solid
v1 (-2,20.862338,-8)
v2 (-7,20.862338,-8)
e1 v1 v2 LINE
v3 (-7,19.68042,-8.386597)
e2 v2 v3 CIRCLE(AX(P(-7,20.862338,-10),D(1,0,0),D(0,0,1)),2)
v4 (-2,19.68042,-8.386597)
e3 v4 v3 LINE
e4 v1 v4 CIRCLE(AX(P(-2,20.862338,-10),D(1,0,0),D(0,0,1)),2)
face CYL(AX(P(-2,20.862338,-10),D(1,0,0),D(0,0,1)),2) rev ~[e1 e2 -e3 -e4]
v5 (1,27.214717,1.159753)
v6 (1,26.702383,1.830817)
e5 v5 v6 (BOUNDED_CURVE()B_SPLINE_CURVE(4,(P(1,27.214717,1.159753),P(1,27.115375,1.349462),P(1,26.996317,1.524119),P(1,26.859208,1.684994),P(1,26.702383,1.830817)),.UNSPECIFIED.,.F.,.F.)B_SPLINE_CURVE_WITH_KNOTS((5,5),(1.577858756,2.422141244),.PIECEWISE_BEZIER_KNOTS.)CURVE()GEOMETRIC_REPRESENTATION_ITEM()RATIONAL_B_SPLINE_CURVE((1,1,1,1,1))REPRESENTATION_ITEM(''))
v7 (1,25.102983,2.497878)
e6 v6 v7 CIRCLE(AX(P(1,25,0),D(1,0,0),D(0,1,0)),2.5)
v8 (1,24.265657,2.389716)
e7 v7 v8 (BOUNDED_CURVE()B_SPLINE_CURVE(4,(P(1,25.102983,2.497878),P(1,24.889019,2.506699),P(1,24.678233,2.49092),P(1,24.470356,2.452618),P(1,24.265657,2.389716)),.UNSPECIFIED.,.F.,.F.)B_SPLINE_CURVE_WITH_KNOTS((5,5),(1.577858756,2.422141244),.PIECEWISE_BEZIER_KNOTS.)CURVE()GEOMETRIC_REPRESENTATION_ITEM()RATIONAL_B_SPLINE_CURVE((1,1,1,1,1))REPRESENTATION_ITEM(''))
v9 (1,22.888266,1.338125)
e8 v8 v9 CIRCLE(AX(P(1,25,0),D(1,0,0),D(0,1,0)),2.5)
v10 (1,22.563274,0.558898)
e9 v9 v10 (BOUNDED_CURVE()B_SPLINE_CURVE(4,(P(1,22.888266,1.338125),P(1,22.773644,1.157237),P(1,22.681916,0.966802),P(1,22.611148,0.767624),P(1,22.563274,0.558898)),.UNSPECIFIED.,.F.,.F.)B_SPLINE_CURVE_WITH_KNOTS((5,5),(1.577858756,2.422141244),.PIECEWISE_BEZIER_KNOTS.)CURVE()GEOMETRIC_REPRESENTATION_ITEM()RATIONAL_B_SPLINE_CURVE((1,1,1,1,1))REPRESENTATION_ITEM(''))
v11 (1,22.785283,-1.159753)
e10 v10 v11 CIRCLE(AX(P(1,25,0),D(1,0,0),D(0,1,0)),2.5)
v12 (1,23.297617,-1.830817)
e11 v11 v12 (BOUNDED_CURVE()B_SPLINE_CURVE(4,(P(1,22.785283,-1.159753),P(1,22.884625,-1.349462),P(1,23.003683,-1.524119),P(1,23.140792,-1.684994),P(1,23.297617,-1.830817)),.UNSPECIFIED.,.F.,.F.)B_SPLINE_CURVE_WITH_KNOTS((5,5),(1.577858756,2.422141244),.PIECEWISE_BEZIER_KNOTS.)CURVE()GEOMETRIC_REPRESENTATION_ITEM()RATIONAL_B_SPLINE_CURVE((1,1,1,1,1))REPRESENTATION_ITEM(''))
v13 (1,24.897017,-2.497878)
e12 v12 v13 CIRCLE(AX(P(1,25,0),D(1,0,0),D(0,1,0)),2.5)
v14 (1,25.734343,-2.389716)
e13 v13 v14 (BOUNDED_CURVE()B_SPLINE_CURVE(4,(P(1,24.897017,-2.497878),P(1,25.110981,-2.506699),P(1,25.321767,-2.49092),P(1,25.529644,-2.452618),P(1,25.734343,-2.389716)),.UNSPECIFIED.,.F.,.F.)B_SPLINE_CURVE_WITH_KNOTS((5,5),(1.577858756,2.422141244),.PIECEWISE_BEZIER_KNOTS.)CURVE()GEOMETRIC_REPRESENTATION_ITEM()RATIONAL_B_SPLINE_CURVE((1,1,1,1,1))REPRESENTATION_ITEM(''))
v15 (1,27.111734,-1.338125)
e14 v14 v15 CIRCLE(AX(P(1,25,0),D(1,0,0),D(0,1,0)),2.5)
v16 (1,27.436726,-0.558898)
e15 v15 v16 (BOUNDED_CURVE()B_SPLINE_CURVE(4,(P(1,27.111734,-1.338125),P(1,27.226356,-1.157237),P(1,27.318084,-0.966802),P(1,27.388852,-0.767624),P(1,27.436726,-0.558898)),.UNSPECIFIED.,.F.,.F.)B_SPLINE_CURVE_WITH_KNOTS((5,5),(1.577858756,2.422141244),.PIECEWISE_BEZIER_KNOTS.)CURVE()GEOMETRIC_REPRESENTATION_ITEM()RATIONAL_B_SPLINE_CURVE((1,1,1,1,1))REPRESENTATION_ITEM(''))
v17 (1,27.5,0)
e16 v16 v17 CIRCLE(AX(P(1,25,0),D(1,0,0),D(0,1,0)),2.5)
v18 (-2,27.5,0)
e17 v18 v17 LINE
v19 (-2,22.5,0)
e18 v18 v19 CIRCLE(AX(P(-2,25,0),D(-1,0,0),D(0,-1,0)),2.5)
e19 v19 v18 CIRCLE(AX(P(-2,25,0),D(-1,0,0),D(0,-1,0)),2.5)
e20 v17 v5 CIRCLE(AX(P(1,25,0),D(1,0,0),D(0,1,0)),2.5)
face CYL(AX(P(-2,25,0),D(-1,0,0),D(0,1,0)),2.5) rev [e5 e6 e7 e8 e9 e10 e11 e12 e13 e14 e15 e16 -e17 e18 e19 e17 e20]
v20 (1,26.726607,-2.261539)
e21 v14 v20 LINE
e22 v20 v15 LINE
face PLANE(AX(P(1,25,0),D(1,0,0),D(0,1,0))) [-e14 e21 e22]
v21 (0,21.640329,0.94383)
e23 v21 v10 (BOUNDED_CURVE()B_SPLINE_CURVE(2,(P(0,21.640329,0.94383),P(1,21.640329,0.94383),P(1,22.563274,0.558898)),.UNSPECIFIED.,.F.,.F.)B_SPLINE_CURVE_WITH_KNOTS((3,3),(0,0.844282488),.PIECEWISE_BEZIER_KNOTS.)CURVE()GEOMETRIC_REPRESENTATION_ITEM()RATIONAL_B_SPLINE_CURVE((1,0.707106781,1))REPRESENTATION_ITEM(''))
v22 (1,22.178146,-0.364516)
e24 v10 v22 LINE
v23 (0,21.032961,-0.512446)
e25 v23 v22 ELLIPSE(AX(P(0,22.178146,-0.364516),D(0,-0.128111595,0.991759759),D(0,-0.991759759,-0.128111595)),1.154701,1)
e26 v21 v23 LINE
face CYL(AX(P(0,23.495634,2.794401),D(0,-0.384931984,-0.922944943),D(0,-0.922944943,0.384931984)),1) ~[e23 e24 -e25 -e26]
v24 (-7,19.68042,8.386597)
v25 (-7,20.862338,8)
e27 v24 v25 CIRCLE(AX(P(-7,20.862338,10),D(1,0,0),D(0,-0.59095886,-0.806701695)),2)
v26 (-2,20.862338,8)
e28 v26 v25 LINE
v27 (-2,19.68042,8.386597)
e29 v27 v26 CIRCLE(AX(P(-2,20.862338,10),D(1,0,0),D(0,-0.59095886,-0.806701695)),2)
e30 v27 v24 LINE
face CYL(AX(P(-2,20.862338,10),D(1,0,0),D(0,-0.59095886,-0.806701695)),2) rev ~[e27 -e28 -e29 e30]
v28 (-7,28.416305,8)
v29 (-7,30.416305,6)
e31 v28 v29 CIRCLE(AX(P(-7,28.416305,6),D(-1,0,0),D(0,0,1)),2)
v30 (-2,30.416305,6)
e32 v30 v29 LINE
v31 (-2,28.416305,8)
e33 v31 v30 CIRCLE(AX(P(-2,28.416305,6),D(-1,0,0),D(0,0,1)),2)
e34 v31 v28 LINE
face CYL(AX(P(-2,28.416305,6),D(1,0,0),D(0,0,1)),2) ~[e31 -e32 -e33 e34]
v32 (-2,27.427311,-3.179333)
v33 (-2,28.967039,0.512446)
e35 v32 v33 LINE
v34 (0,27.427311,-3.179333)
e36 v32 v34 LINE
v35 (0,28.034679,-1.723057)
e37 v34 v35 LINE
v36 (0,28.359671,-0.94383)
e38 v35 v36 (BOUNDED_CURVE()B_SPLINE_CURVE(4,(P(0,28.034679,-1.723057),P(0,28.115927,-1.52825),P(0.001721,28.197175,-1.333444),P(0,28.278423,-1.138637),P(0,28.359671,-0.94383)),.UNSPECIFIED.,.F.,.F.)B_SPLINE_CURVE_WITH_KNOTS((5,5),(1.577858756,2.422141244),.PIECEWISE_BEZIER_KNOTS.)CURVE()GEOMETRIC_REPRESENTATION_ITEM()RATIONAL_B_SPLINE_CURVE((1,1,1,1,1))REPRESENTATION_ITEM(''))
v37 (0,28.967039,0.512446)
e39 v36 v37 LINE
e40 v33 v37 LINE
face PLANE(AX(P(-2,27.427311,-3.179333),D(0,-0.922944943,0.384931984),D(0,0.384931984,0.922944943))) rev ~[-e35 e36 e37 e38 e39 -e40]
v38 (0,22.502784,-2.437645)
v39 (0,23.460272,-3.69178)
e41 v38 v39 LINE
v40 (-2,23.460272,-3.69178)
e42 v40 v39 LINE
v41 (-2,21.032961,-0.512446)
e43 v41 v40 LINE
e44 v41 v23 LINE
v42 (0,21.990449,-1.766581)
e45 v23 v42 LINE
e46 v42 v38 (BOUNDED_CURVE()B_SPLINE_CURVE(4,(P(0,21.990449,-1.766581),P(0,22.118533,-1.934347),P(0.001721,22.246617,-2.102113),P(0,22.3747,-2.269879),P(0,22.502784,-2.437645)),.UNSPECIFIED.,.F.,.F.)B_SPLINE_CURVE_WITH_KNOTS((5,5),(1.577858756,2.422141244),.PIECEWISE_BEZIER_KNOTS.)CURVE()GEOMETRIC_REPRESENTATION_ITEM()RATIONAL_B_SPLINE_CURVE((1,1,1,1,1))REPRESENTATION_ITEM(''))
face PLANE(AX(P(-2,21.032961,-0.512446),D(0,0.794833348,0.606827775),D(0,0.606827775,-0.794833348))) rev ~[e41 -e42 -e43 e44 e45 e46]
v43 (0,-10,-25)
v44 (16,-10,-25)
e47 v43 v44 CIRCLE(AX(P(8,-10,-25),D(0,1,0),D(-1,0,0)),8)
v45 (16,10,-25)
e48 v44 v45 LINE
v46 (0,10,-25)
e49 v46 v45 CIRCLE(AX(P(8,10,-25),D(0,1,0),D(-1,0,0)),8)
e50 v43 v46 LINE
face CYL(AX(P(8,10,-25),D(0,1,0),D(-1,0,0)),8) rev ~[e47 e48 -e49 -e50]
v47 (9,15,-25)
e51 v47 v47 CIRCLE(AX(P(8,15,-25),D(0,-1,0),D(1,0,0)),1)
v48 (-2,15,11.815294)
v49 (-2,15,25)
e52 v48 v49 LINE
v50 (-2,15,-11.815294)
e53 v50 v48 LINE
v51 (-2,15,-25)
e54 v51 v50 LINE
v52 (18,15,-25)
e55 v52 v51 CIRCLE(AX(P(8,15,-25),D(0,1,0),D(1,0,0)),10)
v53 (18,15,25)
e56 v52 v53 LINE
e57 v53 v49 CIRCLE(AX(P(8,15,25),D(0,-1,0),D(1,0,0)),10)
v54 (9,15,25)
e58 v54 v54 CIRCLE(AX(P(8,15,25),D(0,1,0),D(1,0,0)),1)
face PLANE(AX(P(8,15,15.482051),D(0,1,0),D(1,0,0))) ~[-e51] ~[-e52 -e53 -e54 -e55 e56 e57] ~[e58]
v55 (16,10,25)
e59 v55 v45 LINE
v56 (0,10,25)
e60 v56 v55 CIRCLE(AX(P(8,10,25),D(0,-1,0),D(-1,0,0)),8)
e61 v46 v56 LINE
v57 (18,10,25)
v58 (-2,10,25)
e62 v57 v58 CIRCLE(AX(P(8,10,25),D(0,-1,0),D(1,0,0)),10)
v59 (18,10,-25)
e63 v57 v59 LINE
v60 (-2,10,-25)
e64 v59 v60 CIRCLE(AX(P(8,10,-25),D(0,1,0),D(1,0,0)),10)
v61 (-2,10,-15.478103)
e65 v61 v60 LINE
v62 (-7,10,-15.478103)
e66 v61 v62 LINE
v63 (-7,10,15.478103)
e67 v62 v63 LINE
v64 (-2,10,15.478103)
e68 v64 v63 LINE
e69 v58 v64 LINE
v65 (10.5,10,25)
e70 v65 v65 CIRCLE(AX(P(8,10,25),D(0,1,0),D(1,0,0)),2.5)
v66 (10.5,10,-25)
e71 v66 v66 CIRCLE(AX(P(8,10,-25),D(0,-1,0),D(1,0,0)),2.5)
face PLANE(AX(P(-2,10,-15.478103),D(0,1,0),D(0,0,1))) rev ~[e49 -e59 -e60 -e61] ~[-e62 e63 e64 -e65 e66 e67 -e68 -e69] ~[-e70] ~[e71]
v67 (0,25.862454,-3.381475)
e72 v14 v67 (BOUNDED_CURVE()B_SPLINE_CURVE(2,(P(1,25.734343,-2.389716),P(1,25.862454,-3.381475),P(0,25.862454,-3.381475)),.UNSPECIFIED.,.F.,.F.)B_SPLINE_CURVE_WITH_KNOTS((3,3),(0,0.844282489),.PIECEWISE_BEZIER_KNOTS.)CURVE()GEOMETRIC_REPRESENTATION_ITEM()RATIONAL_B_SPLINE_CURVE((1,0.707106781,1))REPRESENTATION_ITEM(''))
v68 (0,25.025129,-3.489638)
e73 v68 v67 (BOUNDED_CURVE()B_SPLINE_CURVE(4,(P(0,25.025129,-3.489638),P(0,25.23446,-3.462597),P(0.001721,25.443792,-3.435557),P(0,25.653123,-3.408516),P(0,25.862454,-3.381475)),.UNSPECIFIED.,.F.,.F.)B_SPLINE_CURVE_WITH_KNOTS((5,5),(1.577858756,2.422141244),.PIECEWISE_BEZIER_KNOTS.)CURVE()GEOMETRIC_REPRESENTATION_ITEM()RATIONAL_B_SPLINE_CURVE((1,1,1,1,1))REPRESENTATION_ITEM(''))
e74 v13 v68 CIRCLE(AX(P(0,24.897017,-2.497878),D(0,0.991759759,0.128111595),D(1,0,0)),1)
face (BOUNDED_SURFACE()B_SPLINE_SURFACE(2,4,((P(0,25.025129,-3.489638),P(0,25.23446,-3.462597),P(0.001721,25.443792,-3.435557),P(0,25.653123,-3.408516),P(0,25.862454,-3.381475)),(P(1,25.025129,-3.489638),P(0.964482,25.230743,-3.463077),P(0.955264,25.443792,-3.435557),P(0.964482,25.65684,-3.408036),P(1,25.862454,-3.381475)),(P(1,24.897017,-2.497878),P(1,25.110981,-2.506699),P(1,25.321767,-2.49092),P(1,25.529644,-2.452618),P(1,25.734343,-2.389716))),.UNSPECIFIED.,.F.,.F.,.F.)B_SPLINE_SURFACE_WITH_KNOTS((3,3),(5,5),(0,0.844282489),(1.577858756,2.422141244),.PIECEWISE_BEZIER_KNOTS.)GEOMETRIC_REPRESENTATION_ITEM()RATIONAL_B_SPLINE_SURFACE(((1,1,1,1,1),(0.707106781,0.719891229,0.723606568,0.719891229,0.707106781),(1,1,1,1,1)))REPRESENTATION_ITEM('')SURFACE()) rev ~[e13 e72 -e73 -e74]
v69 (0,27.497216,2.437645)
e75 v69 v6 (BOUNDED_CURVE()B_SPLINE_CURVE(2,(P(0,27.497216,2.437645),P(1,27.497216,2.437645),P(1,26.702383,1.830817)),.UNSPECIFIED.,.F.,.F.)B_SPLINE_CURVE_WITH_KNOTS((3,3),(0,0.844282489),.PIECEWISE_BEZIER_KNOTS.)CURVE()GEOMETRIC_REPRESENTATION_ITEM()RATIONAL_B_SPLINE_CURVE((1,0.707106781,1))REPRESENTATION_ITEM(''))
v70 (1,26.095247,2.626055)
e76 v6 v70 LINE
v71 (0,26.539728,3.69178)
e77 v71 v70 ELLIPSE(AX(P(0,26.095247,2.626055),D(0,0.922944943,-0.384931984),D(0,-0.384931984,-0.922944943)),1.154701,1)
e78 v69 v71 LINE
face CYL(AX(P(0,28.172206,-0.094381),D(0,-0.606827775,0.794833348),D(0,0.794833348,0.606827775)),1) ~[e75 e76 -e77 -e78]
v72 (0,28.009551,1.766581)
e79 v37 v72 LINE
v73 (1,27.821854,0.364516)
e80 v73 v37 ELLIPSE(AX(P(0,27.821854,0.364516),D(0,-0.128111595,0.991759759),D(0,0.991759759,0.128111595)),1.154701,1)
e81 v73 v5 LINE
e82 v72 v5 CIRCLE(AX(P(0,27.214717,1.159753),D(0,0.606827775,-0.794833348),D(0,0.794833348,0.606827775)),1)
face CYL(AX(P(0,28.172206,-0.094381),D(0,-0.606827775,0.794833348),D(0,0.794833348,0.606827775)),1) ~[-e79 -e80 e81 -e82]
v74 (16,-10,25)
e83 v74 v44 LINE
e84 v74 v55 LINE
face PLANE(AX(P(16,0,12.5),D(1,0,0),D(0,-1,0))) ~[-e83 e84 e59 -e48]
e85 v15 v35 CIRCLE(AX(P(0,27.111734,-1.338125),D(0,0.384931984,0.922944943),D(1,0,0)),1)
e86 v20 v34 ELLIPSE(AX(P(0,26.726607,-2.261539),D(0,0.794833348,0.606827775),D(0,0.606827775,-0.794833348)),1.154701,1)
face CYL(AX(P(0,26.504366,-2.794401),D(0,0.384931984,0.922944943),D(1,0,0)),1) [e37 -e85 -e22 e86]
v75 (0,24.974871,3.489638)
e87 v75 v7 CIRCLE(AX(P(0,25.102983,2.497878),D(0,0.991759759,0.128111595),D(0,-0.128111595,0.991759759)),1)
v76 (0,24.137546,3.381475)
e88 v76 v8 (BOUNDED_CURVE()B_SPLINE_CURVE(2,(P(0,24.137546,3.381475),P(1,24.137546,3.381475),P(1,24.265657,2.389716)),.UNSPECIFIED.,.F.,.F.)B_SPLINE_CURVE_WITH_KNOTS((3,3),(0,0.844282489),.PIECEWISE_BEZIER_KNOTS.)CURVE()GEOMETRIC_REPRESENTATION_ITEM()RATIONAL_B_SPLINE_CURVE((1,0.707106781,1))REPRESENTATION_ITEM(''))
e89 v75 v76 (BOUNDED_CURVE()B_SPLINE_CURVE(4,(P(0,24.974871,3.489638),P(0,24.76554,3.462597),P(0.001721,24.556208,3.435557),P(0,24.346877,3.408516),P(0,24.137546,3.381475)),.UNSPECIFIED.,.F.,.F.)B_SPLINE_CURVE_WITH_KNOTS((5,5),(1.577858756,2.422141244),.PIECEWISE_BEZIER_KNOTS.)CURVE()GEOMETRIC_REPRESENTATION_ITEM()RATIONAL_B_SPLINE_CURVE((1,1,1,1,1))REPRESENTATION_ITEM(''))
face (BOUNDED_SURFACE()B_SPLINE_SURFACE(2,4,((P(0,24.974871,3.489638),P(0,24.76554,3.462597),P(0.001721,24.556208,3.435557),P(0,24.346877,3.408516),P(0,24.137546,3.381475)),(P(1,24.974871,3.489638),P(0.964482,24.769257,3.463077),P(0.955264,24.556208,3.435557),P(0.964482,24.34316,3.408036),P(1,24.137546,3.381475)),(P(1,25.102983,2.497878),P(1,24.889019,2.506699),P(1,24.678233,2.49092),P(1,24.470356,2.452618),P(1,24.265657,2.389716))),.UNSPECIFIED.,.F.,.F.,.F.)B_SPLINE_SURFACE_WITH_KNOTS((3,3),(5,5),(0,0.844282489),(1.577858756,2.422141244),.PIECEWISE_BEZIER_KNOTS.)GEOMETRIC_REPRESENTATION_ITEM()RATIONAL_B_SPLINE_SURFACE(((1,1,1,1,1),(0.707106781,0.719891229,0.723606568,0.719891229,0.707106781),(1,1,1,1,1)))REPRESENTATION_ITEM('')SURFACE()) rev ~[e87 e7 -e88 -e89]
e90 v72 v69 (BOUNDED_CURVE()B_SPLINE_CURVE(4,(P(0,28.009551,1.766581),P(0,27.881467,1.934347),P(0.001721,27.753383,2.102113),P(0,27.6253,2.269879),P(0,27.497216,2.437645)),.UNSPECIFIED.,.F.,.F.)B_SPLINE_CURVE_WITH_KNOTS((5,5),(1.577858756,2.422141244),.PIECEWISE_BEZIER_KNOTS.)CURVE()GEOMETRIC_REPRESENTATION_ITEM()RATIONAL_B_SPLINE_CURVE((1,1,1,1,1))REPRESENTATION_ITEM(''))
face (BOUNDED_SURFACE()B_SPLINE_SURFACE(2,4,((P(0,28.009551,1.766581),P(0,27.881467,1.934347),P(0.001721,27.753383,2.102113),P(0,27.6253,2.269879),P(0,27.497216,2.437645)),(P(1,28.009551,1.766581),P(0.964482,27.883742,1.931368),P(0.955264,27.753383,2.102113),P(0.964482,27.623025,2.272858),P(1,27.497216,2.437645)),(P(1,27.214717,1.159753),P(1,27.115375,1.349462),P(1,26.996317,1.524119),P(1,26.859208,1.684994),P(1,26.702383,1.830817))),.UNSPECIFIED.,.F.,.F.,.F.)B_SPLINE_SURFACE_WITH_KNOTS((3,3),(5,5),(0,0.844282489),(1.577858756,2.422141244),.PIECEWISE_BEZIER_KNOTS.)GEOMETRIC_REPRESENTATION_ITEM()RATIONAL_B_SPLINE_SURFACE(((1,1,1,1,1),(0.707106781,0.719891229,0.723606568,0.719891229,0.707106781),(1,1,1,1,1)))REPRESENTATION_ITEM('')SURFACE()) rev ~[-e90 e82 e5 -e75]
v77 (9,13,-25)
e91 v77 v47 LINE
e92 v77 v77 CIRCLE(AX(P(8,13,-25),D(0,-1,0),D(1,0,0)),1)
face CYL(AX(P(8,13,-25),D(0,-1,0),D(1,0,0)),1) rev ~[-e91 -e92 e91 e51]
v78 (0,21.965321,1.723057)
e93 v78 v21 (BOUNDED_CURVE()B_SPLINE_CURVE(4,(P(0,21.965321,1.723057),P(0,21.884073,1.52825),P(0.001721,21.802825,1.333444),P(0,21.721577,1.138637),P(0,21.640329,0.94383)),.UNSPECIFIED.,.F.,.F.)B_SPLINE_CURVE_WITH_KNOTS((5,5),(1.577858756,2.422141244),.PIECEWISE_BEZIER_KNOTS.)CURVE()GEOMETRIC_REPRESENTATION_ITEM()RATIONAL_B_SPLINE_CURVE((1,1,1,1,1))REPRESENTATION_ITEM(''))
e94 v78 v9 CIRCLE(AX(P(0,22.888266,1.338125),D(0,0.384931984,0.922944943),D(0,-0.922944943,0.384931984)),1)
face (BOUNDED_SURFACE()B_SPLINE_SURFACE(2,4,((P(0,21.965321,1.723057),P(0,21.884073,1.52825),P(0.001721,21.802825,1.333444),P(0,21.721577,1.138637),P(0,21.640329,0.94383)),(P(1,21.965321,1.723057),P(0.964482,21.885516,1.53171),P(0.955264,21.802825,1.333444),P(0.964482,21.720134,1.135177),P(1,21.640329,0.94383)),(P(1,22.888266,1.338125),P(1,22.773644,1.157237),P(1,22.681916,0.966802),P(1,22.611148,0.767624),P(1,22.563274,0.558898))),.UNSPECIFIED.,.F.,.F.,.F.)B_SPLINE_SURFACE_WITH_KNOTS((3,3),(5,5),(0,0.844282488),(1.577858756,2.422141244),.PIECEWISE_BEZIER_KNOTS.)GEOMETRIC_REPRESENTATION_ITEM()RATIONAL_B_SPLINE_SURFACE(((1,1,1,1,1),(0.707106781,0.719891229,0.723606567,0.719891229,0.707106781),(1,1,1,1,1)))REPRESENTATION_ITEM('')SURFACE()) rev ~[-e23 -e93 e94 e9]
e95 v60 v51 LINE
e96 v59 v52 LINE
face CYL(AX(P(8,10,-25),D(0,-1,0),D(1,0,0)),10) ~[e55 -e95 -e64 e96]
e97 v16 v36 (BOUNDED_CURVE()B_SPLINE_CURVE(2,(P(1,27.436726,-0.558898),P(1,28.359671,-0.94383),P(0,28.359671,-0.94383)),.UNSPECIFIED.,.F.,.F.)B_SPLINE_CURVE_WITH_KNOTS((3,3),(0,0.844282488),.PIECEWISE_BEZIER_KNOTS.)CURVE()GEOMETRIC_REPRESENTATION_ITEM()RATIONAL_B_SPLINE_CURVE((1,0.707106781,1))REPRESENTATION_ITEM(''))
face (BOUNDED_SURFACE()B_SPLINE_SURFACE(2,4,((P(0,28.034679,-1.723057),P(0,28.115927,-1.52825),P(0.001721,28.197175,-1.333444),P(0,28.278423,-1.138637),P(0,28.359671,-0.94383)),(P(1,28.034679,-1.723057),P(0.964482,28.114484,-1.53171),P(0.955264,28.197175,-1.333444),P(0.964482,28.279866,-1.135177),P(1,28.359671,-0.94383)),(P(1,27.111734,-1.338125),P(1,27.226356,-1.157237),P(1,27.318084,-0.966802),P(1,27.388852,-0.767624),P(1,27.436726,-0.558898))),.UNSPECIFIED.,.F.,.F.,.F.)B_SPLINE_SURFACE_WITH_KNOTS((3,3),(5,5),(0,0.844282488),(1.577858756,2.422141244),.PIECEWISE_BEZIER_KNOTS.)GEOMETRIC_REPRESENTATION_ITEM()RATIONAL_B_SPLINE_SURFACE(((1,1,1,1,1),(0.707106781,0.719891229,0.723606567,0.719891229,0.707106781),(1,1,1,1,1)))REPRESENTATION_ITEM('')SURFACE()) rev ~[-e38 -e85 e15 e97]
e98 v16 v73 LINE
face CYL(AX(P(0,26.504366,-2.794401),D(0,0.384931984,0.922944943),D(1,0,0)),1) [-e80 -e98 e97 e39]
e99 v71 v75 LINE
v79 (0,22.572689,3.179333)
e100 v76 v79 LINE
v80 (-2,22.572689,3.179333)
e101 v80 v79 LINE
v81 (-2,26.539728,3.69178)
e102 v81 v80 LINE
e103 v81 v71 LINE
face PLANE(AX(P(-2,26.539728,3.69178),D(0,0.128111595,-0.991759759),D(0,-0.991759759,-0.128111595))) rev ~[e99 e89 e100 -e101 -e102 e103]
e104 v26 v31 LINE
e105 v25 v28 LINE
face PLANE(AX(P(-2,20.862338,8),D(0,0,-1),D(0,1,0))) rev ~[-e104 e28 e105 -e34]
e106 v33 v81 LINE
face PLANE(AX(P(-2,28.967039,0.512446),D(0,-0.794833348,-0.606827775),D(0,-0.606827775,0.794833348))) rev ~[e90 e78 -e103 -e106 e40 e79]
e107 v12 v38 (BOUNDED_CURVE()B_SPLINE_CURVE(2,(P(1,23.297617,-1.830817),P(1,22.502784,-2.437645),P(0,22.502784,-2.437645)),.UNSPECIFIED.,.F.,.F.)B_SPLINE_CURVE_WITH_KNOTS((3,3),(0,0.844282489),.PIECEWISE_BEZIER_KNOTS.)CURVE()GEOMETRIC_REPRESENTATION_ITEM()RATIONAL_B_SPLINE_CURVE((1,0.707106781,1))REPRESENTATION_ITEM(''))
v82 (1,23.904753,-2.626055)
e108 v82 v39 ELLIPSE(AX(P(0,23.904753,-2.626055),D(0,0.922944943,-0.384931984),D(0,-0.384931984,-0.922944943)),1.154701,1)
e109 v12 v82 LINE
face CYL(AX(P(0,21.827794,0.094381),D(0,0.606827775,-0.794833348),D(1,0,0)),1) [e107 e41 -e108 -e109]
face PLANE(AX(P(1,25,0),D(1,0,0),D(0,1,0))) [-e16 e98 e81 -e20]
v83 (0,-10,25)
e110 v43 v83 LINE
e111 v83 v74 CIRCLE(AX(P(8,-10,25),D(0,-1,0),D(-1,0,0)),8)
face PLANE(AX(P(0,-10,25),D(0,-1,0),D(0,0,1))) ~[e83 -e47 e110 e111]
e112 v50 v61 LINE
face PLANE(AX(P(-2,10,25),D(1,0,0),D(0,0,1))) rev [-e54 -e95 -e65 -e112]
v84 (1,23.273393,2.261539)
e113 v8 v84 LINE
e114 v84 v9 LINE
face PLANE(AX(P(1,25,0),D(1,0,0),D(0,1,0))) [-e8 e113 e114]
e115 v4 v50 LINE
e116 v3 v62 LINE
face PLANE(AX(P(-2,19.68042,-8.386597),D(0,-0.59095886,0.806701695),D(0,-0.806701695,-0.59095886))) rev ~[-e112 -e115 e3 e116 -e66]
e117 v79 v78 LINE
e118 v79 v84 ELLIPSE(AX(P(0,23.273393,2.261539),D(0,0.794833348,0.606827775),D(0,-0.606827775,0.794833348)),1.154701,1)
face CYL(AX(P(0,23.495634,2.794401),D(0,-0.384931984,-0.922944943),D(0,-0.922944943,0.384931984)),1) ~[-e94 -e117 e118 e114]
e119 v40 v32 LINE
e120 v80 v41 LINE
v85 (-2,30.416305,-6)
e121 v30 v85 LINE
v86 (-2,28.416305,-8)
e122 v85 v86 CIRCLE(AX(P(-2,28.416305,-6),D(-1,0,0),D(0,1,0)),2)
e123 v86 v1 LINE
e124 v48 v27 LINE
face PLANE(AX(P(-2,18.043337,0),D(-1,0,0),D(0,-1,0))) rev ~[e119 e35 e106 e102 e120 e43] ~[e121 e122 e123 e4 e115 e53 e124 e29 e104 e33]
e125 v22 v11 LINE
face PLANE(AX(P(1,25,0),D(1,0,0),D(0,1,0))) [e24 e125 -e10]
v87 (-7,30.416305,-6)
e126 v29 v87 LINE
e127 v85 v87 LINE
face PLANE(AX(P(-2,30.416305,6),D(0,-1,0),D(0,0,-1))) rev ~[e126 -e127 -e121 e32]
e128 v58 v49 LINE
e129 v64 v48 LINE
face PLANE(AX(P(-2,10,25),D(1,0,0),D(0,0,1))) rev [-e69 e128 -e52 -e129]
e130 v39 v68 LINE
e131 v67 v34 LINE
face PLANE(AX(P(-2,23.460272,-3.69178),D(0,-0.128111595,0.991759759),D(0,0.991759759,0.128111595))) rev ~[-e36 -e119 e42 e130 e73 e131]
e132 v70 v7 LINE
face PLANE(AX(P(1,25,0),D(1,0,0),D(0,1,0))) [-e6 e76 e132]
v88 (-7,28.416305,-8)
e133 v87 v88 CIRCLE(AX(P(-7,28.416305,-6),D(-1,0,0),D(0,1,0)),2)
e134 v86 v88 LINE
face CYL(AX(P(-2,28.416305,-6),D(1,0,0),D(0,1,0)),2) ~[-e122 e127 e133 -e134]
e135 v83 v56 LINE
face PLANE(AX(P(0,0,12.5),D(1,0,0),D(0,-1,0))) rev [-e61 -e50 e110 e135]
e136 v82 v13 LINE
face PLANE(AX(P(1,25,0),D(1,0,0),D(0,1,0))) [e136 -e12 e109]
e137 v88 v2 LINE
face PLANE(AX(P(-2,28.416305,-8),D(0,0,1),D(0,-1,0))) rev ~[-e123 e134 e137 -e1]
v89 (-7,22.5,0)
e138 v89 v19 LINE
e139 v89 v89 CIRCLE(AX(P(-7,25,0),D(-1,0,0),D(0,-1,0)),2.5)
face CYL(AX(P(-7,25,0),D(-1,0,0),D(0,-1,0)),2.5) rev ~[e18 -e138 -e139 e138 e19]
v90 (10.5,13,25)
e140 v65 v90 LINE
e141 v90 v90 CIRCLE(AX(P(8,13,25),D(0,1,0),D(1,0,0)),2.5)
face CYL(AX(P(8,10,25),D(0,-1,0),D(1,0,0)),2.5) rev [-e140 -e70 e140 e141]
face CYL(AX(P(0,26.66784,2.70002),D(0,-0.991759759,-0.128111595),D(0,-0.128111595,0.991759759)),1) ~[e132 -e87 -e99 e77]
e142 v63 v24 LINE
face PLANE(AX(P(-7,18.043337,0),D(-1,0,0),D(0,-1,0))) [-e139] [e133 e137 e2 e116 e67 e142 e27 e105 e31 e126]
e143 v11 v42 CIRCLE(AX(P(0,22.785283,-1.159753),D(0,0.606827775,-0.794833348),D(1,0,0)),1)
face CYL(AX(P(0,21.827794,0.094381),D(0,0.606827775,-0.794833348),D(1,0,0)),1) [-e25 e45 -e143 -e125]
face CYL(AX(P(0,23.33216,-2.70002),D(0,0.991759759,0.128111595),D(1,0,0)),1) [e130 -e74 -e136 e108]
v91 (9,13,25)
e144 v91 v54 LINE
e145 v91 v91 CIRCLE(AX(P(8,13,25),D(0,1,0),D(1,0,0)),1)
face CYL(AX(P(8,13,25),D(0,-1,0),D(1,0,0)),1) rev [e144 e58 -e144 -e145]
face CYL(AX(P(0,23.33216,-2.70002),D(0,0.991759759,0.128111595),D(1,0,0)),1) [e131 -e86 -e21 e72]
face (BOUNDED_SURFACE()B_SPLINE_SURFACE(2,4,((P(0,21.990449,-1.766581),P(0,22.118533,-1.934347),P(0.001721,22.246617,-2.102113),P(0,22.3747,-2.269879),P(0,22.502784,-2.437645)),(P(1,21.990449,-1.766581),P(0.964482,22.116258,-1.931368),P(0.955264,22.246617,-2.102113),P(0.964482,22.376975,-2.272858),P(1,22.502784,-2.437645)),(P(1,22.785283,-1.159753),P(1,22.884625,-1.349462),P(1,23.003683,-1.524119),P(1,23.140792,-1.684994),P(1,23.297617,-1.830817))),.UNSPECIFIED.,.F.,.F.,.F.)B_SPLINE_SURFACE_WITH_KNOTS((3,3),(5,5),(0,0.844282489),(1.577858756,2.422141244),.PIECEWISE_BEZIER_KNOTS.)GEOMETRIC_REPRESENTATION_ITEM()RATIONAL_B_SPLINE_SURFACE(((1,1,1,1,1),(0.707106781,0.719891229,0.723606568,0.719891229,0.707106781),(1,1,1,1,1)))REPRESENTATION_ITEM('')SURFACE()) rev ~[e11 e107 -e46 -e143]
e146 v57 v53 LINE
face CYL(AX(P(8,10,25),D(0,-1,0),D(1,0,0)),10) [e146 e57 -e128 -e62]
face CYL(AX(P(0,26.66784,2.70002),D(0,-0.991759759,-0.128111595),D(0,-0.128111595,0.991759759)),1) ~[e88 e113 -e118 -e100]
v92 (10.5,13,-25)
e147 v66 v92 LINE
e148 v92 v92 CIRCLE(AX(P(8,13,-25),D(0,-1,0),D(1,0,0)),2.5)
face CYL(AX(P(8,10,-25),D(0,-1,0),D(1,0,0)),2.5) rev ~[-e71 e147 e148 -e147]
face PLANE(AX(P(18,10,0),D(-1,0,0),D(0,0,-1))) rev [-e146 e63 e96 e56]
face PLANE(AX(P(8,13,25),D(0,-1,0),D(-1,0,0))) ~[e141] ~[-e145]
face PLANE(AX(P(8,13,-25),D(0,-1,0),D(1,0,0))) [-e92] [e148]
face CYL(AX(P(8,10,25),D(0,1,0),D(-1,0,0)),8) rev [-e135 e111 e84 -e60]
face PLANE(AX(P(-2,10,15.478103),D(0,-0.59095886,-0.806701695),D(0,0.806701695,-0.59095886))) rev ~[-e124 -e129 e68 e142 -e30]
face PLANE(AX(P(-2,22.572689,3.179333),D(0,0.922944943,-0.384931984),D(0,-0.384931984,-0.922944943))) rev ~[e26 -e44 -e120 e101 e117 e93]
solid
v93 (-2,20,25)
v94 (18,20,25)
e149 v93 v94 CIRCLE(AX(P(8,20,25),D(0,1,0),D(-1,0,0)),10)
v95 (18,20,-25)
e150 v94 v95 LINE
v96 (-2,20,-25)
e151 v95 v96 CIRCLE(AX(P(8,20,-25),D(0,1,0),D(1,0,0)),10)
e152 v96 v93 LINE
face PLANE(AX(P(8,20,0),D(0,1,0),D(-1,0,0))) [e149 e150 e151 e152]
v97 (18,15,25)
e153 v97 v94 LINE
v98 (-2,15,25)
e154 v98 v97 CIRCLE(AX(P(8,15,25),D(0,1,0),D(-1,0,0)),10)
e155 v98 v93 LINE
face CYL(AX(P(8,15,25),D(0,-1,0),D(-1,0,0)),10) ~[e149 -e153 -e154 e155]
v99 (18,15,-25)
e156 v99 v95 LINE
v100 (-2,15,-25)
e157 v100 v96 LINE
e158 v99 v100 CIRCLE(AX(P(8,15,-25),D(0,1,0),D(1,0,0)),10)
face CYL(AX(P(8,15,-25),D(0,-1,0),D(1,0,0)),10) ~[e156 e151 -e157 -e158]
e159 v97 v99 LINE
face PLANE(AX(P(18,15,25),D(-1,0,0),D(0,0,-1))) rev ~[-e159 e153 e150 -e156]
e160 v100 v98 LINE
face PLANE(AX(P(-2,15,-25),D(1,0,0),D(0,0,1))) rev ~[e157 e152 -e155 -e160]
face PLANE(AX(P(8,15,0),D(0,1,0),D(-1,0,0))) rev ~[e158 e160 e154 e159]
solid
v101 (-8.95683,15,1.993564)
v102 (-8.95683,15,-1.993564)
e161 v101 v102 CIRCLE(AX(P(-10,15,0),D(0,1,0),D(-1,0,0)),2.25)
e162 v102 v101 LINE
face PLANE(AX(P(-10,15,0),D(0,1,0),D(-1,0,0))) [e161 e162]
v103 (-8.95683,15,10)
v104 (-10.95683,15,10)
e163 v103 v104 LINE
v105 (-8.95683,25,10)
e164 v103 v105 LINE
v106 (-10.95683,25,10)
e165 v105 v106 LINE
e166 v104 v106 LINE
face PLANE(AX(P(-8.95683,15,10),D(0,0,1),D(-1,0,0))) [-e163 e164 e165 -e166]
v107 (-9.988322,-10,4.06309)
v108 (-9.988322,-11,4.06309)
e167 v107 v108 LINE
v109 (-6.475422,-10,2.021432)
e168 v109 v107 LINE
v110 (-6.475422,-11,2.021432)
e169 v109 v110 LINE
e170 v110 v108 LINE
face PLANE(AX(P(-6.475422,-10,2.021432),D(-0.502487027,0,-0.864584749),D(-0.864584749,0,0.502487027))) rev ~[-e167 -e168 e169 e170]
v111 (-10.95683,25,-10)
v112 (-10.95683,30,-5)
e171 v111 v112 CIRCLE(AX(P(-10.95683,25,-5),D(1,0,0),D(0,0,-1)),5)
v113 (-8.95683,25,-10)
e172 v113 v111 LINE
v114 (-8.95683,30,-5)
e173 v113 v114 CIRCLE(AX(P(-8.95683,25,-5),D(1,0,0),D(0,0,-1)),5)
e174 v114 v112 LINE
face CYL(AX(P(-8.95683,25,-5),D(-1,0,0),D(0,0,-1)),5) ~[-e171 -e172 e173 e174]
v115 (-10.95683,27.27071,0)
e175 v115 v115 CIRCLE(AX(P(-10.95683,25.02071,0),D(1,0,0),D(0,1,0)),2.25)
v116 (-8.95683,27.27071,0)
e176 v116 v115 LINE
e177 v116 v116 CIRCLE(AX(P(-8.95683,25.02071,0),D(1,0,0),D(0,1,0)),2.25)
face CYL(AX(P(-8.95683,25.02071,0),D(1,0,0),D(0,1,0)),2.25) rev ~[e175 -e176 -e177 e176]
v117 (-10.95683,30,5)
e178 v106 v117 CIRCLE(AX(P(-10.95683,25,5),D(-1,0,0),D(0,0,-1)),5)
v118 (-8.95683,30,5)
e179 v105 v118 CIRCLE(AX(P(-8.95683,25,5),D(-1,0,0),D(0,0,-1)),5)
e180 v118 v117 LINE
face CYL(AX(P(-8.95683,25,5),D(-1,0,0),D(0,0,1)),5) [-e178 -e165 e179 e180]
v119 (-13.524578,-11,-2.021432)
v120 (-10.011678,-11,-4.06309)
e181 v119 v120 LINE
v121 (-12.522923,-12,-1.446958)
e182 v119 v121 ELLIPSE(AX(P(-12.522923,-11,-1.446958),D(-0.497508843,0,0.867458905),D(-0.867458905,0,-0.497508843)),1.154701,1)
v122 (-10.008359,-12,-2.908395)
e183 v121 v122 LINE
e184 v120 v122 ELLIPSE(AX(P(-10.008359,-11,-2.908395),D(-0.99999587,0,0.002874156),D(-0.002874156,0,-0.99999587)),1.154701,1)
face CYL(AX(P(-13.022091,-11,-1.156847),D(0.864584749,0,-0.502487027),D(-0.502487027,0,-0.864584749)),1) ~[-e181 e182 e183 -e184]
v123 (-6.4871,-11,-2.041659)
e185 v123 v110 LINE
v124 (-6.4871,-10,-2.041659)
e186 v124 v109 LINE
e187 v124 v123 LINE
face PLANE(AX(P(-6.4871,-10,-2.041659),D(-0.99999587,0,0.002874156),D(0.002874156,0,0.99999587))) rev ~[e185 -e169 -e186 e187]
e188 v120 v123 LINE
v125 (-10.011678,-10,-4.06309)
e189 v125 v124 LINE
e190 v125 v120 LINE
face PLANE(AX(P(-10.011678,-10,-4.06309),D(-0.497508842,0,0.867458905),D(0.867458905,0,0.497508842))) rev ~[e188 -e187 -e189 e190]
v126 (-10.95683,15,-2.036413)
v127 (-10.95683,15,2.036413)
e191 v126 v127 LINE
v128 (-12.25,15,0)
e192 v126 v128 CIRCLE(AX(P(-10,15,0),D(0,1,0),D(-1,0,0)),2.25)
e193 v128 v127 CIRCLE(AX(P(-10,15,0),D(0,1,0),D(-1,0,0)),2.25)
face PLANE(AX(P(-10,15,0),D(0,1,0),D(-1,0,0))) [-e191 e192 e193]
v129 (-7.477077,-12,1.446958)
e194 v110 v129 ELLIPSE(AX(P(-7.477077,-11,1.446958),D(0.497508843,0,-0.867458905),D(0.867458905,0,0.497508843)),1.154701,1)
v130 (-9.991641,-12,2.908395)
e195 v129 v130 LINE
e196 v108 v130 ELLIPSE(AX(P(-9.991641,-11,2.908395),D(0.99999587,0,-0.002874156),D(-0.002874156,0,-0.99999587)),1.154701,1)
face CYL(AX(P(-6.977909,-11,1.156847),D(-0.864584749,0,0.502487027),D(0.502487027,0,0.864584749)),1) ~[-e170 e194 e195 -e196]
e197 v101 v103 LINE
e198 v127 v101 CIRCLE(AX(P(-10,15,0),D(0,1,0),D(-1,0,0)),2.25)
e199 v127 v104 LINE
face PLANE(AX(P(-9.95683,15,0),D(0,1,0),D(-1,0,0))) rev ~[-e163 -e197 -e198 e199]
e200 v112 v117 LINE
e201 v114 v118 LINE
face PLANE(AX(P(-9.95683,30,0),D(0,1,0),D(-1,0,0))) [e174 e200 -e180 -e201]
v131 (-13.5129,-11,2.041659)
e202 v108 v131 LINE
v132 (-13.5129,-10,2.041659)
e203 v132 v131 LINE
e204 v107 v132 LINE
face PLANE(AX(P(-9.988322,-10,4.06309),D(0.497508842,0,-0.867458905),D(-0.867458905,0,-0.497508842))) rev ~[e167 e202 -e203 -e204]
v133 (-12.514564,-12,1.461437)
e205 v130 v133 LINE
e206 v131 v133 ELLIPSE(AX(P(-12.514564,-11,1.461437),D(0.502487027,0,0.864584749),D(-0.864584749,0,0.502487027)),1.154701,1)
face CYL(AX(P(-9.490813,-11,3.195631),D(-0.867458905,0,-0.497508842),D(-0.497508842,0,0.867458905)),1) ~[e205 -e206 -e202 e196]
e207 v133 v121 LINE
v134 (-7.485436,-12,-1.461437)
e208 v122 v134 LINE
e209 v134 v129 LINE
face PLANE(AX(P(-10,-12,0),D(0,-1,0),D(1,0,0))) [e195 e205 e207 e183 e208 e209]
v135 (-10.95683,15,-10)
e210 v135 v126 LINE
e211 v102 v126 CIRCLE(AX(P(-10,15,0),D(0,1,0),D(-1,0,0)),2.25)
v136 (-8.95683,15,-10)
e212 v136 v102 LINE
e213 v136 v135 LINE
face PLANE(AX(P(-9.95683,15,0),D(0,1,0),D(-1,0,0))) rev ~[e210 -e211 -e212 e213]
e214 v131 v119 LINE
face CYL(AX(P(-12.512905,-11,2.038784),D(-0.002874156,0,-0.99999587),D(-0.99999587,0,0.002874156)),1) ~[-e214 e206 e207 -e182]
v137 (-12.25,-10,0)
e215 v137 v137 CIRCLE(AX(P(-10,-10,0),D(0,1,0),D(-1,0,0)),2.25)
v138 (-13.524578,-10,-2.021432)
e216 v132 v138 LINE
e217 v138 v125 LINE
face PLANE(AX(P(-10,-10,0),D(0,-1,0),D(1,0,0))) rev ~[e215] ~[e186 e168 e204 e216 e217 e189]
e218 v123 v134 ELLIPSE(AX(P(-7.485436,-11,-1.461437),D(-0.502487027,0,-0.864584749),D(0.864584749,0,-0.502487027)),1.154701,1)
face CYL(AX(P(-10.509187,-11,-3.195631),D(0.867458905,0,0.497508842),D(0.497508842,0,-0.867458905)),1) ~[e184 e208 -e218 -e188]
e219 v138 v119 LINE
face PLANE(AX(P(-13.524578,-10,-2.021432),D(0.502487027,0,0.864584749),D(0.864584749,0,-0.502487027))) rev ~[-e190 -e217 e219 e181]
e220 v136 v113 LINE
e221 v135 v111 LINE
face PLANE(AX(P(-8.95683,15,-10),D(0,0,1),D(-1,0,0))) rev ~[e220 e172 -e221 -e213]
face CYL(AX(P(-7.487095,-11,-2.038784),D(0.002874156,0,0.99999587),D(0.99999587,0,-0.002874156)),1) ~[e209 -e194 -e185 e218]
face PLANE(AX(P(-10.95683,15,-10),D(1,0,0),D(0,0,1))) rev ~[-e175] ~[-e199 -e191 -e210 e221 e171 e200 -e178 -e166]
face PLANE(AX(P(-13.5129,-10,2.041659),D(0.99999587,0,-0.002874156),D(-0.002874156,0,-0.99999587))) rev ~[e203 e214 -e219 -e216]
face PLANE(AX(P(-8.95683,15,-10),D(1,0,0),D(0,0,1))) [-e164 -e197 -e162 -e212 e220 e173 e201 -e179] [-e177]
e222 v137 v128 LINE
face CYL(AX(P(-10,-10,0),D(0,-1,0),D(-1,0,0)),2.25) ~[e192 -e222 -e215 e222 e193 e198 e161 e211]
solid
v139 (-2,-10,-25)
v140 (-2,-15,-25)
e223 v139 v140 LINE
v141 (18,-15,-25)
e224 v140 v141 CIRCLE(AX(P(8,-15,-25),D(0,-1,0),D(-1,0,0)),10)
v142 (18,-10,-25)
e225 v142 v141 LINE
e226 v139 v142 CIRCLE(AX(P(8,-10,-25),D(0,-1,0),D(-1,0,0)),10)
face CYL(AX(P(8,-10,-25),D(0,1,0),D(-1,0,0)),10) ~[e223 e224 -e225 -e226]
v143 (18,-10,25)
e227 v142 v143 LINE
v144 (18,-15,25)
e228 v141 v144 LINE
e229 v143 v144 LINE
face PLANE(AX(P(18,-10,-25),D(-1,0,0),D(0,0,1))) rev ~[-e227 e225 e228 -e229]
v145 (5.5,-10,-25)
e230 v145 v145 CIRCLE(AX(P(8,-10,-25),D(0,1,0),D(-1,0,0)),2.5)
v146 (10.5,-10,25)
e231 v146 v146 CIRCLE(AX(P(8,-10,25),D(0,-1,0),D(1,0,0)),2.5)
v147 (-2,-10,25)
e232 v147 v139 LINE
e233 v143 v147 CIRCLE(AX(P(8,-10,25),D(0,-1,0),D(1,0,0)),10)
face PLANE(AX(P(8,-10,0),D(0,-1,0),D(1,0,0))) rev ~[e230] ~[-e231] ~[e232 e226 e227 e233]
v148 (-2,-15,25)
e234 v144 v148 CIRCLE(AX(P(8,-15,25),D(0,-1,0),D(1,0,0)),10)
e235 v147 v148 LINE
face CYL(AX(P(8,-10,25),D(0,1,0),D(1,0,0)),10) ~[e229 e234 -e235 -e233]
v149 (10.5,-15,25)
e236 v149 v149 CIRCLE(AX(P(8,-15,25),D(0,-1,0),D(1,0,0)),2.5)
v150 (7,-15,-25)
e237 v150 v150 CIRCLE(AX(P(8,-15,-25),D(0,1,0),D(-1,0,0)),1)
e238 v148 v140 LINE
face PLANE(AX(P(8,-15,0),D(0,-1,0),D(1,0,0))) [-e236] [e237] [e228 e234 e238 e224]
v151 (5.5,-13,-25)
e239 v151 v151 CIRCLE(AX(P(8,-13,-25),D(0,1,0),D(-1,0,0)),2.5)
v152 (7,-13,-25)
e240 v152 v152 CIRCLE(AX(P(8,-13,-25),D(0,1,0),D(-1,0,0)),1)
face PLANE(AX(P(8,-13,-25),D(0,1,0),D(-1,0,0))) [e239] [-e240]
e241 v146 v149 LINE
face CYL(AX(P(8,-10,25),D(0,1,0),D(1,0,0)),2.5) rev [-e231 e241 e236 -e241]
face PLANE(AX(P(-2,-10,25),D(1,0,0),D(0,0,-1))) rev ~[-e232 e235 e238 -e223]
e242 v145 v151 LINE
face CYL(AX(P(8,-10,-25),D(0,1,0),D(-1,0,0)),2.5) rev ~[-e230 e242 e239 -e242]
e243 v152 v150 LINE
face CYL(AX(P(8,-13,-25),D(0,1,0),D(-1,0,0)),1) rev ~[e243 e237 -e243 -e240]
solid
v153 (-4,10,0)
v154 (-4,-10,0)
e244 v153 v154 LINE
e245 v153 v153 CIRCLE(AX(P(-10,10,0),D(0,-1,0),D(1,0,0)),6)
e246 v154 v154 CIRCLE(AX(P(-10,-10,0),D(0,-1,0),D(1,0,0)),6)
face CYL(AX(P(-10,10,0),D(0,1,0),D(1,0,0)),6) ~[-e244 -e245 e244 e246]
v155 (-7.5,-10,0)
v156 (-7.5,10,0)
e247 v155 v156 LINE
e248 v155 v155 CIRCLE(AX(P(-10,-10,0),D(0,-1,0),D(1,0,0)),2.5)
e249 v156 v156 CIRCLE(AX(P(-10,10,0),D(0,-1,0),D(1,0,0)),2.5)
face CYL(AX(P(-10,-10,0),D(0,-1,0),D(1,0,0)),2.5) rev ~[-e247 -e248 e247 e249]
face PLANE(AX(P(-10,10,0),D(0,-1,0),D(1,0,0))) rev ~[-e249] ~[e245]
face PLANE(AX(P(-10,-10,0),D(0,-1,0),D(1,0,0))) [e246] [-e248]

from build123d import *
from build123d import SkipClean  # not in build123d's __all__

# Parameters (mm, degrees)
F0_W      = 20
F0_H      = 25
F1_DEPTH  = 16
F3_DEPTH  = 20.001
F5_DEPTH  = 5
F6_R      = 2.5
F7_DEPTH  = 3
F8_R      = 1
F9_DEPTH  = 2.001
F11_R     = 2.5
F12_DEPTH = 5
F13_R     = 2.5
F14_DEPTH = 3
F15_R     = 1
F16_DEPTH = 2.001
F18_DEPTH = 5
F19_R     = 2.5
F20_DEPTH = 25.001
F21_R     = 2.5
F22_DEPTH = 3
F23_R     = 1
F25_DEPTH = 5
F26_R     = 6
F27_DEPTH = 20
F28_R     = 2.5
F29_DEPTH = 40.4173054965
F31_DEPTH = 2
F32_R     = 1
F33_R     = 2.25
F34_DEPTH = 25
F35_W     = 2
F35_H     = 20
F36_DEPTH = 15
F37_R     = 5
F38_R     = 2.25
F39_DEPTH = 7.0441698188


with BuildPart() as f1:
    # F0 (on Right) → F1 (new body)
    with BuildSketch(Plane.YZ):
        with Locations((0, -12.5)):
            Rectangle(F0_W, F0_H)
    extrude(amount=F1_DEPTH)

    # F2 (on face) → F3 (cut, through all)
    with BuildSketch(Plane(origin=(0, 10, 0), x_dir=(-1, 0, 0), z_dir=(0, 1, 0))):
        with BuildLine():
            Line((-16, -25), (0, -25))
            ThreePointArc((0, -25), (-8, -17), (-16, -25))
        make_face()
    extrude(amount=-F3_DEPTH, mode=Mode.SUBTRACT)

    # F4 (on face) → F5 (join)
    with BuildSketch(Plane(origin=(0, 10, 0), x_dir=(-1, 0, 0), z_dir=(0, 1, 0))):
        with BuildLine():
            Line((-18, 0), (-18, -25))
            ThreePointArc((-18, -25), (-8, -35), (2, -25))
            Line((2, -25), (2, 0))
            Line((2, 0), (-18, 0))
        make_face()
    extrude(amount=F5_DEPTH)

    # F6 (on face) → F7 (cut)
    with BuildSketch(Plane.XZ.offset(-10)):
        with Locations((8, -25)):
            Circle(F6_R)
    extrude(amount=-F7_DEPTH, mode=Mode.SUBTRACT)

    # F8 (on face) → F9 (cut, through all)
    with BuildSketch(Plane.XZ.offset(-13)):
        with Locations((8, -25)):
            Circle(F8_R)
    extrude(amount=-F9_DEPTH, mode=Mode.SUBTRACT)

    # F10: F1 across plane


with BuildPart() as f1_1:
    add(f1.part, clean=False)
    add(f1.part.mirror(Plane.XY), clean=False)

    # F17 (on face) → F18 (join)
    with BuildSketch(Plane(origin=(-2, 0, 0), x_dir=(0, -1, 0), z_dir=(-1, 0, 0))):
        with BuildLine():
            Line((-28.4163054965, -8), (-20.862338065, -8))
            ThreePointArc((-20.862338065, -8), (-20.2405691294, -8.0991045819), (-19.6804203442, -8.3865966093))
            Line((-19.6804203442, -8.3865966093), (-10, -15.4781029345))
            Line((-10, -15.4781029345), (-10, -8))
            Line((-10, -8), (-10, 8))
            Line((-10, 8), (-10, 15.4781029345))
            Line((-10, 15.4781029345), (-19.6804203442, 8.3865966093))
            ThreePointArc((-19.6804203442, 8.3865966093), (-20.2405691294, 8.0991045819), (-20.862338065, 8))
            Line((-20.862338065, 8), (-28.4163054965, 8))
            ThreePointArc((-28.4163054965, 8), (-29.8305190589, 7.4142135624), (-30.4163054965, 6))
            Line((-30.4163054965, 6), (-30.4163054965, -6))
            ThreePointArc((-30.4163054965, -6), (-29.8305190589, -7.4142135624), (-28.4163054965, -8))
        make_face()
    extrude(amount=F18_DEPTH)

    # F19 (on face) → F20 (cut, through all)
    with BuildSketch(Plane(origin=(-7, 0, 0), x_dir=(0, -1, 0), z_dir=(-1, 0, 0))):
        with Locations((-25, 0)):
            Circle(F19_R)
    extrude(amount=-F20_DEPTH, mode=Mode.SUBTRACT)

    # F21 (on face) → F22 (join)
    with BuildSketch(Plane.YZ.offset(-2)):
        Polygon((26.5397279342, 3.6917797725), (22.5726888989, 3.1793333922), (21.0329609647, -0.5124463803), (23.4602720658, -3.6917797725), (27.4273111011, -3.1793333922), (28.9670390353, 0.5124463803), align=None)
        with Locations((25, 0)):
            Circle(F21_R, mode=Mode.SUBTRACT)
    with SkipClean():  # cleaning this boolean's faces spoils the solid; the shape is the same uncleaned
        extrude(amount=F22_DEPTH)

    # F23
    f23_edges = [f1_1.edges().sort_by_distance(p)[0] for p in [
        (1, 24.556208, 3.435557),
        (1, 21.802825, 1.333444),
        (1, 22.246617, -2.102113),
        (1, 25.443792, -3.435557),
        (1, 28.197175, -1.333444),
        (1, 27.753383, 2.102113),
    ]]
    fillet(f23_edges, radius=F23_R)


with BuildPart() as f12:
    # F11 (on face) → F12 (new body)
    with BuildSketch(Plane.XZ.offset(10)):
        with BuildLine():
            Line((-2, 25), (-2, -25))
            ThreePointArc((-2, -25), (8, -35), (18, -25))
            Line((18, -25), (18, 25))
            ThreePointArc((18, 25), (8, 35), (-2, 25))
        make_face()
        with BuildLine():
            Line((0, -25), (0, 25))
            ThreePointArc((0, 25), (8, 17), (16, 25))
            Line((16, 25), (16, -25))
            ThreePointArc((16, -25), (8, -17), (0, -25))
        make_face(mode=Mode.SUBTRACT)
        with Locations((8, 25)):
            Circle(F11_R, mode=Mode.SUBTRACT)
        with BuildLine():
            ThreePointArc((16, 25), (8, 17), (0, 25))
            Line((0, 25), (0, -25))
            ThreePointArc((0, -25), (8, -17), (16, -25))
            Line((16, -25), (16, 25))
        make_face()
    extrude(amount=F12_DEPTH)

    # F13 (on face) → F14 (cut)
    with BuildSketch(Plane(origin=(0, -10, 0), x_dir=(-1, 0, 0), z_dir=(0, 1, 0))):
        with Locations((-8, -25)):
            Circle(F13_R)
    extrude(amount=-F14_DEPTH, mode=Mode.SUBTRACT)

    # F15 (on face) → F16 (cut, through all)
    with BuildSketch(Plane(origin=(0, -13, 0), x_dir=(-1, 0, 0), z_dir=(0, 1, 0))):
        with Locations((-8, -25)):
            Circle(F15_R)
    extrude(amount=-F16_DEPTH, mode=Mode.SUBTRACT)


with BuildPart() as f25:
    # F24 (on face) → F25 (new body)
    with BuildSketch(Plane(origin=(0, 15, 0), x_dir=(-1, 0, 0), z_dir=(0, 1, 0))):
        with BuildLine():
            Line((-18, 25), (-18, -25))
            ThreePointArc((-18, -25), (-8, -35), (2, -25))
            Line((2, -25), (2, 25))
            ThreePointArc((2, 25), (-8, 35), (-18, 25))
        make_face()
    extrude(amount=F25_DEPTH)


with BuildPart() as f27:
    # F26 (on face) → F27 (new body)
    with BuildSketch(Plane.XZ.offset(-10)):
        with Locations((-10, 0)):
            Circle(F26_R)
    extrude(amount=F27_DEPTH)

    # F28 (on face) → F29 (cut, through all)
    with BuildSketch(Plane.XZ.offset(10)):
        with Locations((-10, 0)):
            Circle(F28_R)
    extrude(amount=-F29_DEPTH, mode=Mode.SUBTRACT)


with BuildPart() as f31:
    # F30 (on face) → F31 (new body)
    with BuildSketch(Plane.XZ.offset(10)):
        Polygon((-6.4870996044, -2.041658587), (-6.4754216, 2.0214316901), (-9.9883219956, 4.063090277), (-13.5129003956, 2.041658587), (-13.5245784, -2.0214316901), (-10.0116780044, -4.063090277), align=None)
    extrude(amount=F31_DEPTH)

    # F32
    f32_edges = [f31.edges().sort_by_distance(p)[0] for p in [
        (-11.750611, -12, 3.052374),
        (-13.518739, -12, 0.010113),
        (-11.768128, -12, -3.042261),
        (-8.249389, -12, -3.052374),
        (-6.481261, -12, -0.010113),
        (-8.231872, -12, 3.042261),
    ]]
    fillet(f32_edges, radius=F32_R)

    # F33 (on face) → F34 (join)
    with BuildSketch(Plane(origin=(0, -10, 0), x_dir=(-1, 0, 0), z_dir=(0, 1, 0))):
        with Locations((10, 0)):
            Circle(F33_R)
    extrude(amount=F34_DEPTH)

    # F35 (on face) → F36 (join)
    with BuildSketch(Plane(origin=(0, 15, 0), x_dir=(-1, 0, 0), z_dir=(0, 1, 0))):
        with Locations((9.9568301812, 0)):
            Rectangle(F35_W, F35_H)
    extrude(amount=F36_DEPTH)

    # F37
    f37_edges = [f31.edges().sort_by_distance(p)[0] for p in [
        (-9.95683, 30, 10),
        (-9.95683, 30, -10),
    ]]
    fillet(f37_edges, radius=F37_R)

    # F38 (on face) → F39 (cut, through all)
    with BuildSketch(Plane.YZ.offset(-8.9568301812)):
        with Locations((25.0207103503, 0)):
            Circle(F38_R)
    extrude(amount=-F39_DEPTH, mode=Mode.SUBTRACT)


solid = Compound([f1_1.part, f12.part, f25.part, f27.part, f31.part])
